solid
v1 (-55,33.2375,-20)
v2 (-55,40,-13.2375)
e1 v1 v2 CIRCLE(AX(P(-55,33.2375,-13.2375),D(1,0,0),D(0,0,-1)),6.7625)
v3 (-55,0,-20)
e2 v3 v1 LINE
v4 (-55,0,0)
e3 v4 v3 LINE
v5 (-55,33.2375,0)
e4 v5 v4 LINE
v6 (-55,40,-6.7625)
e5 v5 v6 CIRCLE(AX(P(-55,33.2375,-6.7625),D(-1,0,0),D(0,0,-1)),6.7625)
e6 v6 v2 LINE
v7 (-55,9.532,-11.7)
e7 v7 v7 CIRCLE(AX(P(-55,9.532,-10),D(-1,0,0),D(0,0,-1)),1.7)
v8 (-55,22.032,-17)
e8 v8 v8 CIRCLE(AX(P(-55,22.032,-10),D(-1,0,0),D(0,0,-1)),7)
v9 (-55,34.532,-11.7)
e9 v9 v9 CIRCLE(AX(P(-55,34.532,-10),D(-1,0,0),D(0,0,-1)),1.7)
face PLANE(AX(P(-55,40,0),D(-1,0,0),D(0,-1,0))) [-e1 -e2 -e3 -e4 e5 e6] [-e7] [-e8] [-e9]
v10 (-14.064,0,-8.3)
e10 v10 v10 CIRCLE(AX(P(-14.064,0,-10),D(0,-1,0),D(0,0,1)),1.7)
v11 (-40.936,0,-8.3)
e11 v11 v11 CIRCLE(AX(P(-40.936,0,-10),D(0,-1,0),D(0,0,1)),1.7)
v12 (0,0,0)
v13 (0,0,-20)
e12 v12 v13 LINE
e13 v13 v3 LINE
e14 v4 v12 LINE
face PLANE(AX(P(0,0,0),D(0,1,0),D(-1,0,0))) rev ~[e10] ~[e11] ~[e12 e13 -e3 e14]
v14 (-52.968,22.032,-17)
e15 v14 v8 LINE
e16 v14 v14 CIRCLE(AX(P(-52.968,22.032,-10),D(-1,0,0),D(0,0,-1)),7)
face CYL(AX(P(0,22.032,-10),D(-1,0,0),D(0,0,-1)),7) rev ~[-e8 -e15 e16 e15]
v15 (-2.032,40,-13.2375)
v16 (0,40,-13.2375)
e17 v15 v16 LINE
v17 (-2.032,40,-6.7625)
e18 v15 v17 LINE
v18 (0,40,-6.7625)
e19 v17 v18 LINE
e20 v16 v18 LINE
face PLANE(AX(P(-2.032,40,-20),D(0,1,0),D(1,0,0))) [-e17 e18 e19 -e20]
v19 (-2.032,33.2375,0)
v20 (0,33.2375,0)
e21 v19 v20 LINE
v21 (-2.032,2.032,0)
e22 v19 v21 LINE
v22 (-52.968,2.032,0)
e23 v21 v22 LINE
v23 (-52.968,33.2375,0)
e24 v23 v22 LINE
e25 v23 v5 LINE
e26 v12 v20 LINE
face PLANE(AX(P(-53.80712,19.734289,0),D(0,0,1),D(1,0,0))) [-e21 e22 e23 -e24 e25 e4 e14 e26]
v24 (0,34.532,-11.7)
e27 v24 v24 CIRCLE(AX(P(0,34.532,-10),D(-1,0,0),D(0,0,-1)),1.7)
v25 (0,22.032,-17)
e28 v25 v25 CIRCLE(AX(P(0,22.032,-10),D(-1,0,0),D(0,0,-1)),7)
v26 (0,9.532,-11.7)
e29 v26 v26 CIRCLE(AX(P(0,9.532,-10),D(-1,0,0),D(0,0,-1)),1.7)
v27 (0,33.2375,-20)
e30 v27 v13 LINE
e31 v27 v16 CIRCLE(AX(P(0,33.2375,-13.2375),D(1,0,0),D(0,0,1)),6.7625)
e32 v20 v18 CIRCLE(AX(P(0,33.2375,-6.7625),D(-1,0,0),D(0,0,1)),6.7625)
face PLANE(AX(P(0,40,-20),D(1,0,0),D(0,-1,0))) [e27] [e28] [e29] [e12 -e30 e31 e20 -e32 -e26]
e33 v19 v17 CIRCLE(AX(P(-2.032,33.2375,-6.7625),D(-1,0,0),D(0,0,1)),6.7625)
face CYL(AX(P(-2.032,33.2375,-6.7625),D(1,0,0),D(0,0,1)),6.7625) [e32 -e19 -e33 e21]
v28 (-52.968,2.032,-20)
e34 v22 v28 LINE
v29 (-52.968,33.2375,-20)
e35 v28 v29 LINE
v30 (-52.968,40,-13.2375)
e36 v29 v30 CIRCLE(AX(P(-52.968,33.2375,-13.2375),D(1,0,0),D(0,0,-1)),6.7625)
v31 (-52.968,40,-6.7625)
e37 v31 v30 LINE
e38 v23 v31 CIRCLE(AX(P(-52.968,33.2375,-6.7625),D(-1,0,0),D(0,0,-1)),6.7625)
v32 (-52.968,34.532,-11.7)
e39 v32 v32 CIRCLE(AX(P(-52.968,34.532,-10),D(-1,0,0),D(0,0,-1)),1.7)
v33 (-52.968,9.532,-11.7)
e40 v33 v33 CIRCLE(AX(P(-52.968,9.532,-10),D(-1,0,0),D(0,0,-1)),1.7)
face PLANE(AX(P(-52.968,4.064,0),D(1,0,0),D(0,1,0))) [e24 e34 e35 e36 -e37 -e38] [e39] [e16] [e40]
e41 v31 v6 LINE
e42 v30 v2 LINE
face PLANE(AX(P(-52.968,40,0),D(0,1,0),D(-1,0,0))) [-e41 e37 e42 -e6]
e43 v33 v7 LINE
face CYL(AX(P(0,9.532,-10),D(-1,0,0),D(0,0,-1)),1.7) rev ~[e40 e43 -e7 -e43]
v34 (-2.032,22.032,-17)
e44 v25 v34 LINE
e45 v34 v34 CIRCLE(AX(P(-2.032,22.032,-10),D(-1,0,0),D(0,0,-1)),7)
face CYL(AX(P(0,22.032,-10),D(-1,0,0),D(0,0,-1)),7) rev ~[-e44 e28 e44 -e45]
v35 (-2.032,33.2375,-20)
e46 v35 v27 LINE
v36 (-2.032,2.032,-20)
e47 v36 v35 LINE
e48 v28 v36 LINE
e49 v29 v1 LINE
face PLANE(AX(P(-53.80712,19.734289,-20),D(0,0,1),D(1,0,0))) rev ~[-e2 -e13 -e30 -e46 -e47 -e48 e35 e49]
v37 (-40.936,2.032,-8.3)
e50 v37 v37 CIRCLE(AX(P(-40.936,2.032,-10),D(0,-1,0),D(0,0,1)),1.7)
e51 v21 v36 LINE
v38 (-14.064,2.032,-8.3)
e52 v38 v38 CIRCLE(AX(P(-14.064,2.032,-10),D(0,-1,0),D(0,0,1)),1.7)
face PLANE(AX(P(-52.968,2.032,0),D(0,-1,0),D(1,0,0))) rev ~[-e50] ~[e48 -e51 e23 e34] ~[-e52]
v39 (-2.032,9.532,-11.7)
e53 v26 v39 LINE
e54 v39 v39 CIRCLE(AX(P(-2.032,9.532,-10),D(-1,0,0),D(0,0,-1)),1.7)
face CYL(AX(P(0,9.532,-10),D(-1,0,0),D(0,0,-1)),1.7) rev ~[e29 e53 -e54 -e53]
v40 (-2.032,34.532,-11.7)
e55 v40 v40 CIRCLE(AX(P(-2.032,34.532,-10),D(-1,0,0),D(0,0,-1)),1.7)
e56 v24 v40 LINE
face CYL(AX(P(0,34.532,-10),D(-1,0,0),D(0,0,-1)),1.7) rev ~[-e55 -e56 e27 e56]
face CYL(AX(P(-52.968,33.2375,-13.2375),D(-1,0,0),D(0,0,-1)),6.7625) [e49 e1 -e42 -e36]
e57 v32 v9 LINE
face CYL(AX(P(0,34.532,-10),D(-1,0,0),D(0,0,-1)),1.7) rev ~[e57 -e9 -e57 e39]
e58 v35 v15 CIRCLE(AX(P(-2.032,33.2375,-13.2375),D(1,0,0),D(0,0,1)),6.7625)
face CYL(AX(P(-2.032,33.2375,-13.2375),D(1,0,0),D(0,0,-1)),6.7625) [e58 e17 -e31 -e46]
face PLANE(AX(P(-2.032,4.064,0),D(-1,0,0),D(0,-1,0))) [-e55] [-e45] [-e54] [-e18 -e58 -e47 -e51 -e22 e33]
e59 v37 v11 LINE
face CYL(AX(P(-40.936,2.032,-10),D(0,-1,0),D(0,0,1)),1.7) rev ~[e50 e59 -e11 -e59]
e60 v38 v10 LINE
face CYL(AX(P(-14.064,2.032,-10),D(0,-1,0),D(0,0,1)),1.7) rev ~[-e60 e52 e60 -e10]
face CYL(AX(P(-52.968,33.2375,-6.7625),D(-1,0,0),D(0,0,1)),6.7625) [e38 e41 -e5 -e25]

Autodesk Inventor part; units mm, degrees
ref_plane "YZ Plane" through (0, 0, 0) normal (1, 0, 0) x (0, 1, 0)
ref_plane "XZ Plane" through (0, 0, 0) normal (0, 1, 0) x (-1, 0, 0)
ref_plane "XY Plane" through (0, 0, 0) normal (0, 0, 1) x (1, 0, 0)
sketch "Sketch3" plane through (0, 0, 0) normal (0, 1, 0) x (-1, 0, 0)
  line L0 (55, 0) -> (0, 0)
  line L1 (0, 0) -> (0, -20)
  line L2 (0, -20) -> (55, -20)
  line L3 (55, -20) -> (55, 0)
  dimension "d9" = 55
  dimension "d10" = 20
extrude "Plate1" add sketch "Sketch3" along normal blind 2.032
sketch "Sketch4" plane through (-52.968, 0, 0) normal (-1, 0, 0) x (0, -1, 0)
  line L0 (0, -20) -> (0, 0)
  line L1 (0, 0) -> (-40, 0)
  line L2 (-40, 0) -> (-40, -20)
  line L3 (-40, -20) -> (0, -20)
edge flange "Flange1" height 40 angle 90 thickness 2.032 bend radius 2.032 thickness toward (-1, 0, 0) relief tear relief width 2.032 relief depth 1.016 corner gap 2.032 corner form 0 edges at (-55, 2.032, -10) (0, 2.032, -10) wall of the first edge with corners at (-52.968, 0, -20) (-52.968, 0, 0) (-52.968, 40, 0) (-52.968, 40, -20)
bend "Bend1"
corner "Corner1"
sketch "Sketch5" plane through (0, 40, 0) normal (1, 0, 0) x (0, 0, -1)
  line L0 (0, -35.936) -> (20, -35.936) projected
  line L1 (0, -35.936) -> (20, -35.936) projected
  line L2 (20, 0) -> (20, -35.936) projected
  line L3 (0, 0) -> (20, 0) projected
  line L4 (0, -35.936) -> (0, 0) projected
  line L5 (20, -35.936) -> (20, 0) projected
  line L6 (20, -17.968) -> (0, -17.968) construction
  line L7 (0, -35.936) -> (0, 0) projected
  point P0 (0, -40)
  point P1 (10, -5.468)
  point P2 (10, -17.968)
  point P3 (10, -30.468)
  point P4 (10, -35.936)
  point P5 (10, -17.968)
  dimension "d22" = 12.5
  dimension "d23" = 12.5
hole "Hole1" at (0, 9.532, -10) at (0, 34.532, -10) direction (-1, 0, 0) diameter 3.4 depth 55 clearance for "Socket Head Cap Screw" size "M3" standard "Ansi Metric M Profile"
hole "Hole2" at (0, 22.032, -10) direction (-1, 0, 0) diameter 14 depth 55
fillet "Fillet1" radius 6.7625 4 edges at (-53.984, 40, 0) (-53.984, 40, -20) (-1.016, 40, -20) (-1.016, 40, 0)
sketch "Sketch6" plane through (0, 2.032, 0) normal (0, 1, 0) x (1, 0, 0)
  line L0 (-4.064, 0) -> (-4.064, 20) projected
  line L1 (-50.936, 20) -> (-4.064, 20) projected
  line L2 (-50.936, 20) -> (-50.936, 0) projected
  line L3 (-4.064, 0) -> (-50.936, 0) projected
  line L4 (-4.064, 0) -> (-4.064, 20) projected
  line L5 (-4.064, 10) -> (-14.064, 10) construction
  line L6 (-40.936, 10) -> (-50.936, 10) construction
  point P0 (0, 0)
  dimension "d39" = 10
hole "Hole3" at (-40.936, 2.032, -10) at (-14.064, 2.032, -10) direction (0, -1, 0) diameter 3.4 end through all clearance for "Socket Head Cap Screw" size "M3" standard "Ansi Metric M Profile"
sketch "Sketch7" plane through (-50.936, 0, 0) normal (0, 0, 1) x (1, 0, 0)
  line L0 (48.904, 4.064) -> (50.936, 4.064) projected
  arc A0 (46.872, 2.032) -> (48.904, 4.064) centre (46.872, 4.064) ccw projected
  line L1 (46.872, 0) -> (46.872, 2.032) projected
  arc A1 (46.872, 0) -> (50.936, 4.064) centre (46.872, 4.064) ccw projected
  line L2 (-4.064, 4.064) -> (-2.032, 4.064) projected
  arc A2 (-4.064, 4.064) -> (0, 0) centre (0, 4.064) ccw projected
  line L3 (0, 2.032) -> (0, 0) projected
  arc A3 (-2.032, 4.064) -> (0, 2.032) centre (0, 4.064) ccw projected
  arc A4 (-2.032, 4.064) -> (0, 2.032) centre (0, 4.064) ccw projected
  line L4 (-2.032, 4.064) -> (-2.032, 2.032)
  line L5 (-2.032, 2.032) -> (0, 2.032)
  arc A5 (-4.064, 4.064) -> (0, 0) centre (0, 4.064) ccw projected
  line L6 (0, 0) -> (-4.064, 0)
  line L7 (-2.032, 4.064) -> (-4.064, 4.064) projected
  line L8 (-4.064, 0) -> (-4.064, 4.064)
  arc A6 (46.872, 2.032) -> (48.904, 4.064) centre (46.872, 4.064) ccw projected
  line L9 (48.904, 4.064) -> (48.904, 2.032)
  line L10 (48.904, 2.032) -> (46.872, 2.032)
  line L11 (0, 0) -> (46.872, 0) projected
  line L12 (46.872, 0) -> (50.936, 0)
  line L13 (50.936, 0) -> (50.936, 4.064)
  point P0 (50.936, 0)
  point P1 (0, 0)
extrude "Extrusion3" cut sketch "Sketch7" against normal through all contours L9 L10 A0 | A3 L5 L4
extrude "Extrusion4" add sketch "Sketch7" against normal up to surface (20 mm away) contours L13 L12 A1 | A2 L6 L8
equation "\"d29\" = Thickness"
equation "\"d11\" = Thickness"
equation "\"d12\" = BendReliefWidth"
equation "\"d13\" = BendReliefDepth"
equation "\"d14\" = MinimumRemnant"
equation "\"d15\" = TransitionRadius"
equation "\"d18\" = BendRadius"
equation "\"d19\" = CornerReliefSize"
equation "\"d20\" = GapSize"
equation "\"d21\" = JacobiRadiusSize"
equation "\"BendRadius\" = Thickness"
equation "\"BendReliefWidth\" = Thickness"
equation "\"BendReliefDepth\" = 0.5 * Thickness"
equation "\"CornerReliefSize\" = 4 * Thickness"
equation "\"MinimumRemnant\" = 2 * Thickness"
equation "\"TransitionRadius\" = BendRadius"
equation "\"JacobiRadiusSize\" = BendRadius"
equation "\"GapSize\" = Thickness"
equation "\"Thickness\" = 2.032"
properties part number "Z Idle Mount-RP"
